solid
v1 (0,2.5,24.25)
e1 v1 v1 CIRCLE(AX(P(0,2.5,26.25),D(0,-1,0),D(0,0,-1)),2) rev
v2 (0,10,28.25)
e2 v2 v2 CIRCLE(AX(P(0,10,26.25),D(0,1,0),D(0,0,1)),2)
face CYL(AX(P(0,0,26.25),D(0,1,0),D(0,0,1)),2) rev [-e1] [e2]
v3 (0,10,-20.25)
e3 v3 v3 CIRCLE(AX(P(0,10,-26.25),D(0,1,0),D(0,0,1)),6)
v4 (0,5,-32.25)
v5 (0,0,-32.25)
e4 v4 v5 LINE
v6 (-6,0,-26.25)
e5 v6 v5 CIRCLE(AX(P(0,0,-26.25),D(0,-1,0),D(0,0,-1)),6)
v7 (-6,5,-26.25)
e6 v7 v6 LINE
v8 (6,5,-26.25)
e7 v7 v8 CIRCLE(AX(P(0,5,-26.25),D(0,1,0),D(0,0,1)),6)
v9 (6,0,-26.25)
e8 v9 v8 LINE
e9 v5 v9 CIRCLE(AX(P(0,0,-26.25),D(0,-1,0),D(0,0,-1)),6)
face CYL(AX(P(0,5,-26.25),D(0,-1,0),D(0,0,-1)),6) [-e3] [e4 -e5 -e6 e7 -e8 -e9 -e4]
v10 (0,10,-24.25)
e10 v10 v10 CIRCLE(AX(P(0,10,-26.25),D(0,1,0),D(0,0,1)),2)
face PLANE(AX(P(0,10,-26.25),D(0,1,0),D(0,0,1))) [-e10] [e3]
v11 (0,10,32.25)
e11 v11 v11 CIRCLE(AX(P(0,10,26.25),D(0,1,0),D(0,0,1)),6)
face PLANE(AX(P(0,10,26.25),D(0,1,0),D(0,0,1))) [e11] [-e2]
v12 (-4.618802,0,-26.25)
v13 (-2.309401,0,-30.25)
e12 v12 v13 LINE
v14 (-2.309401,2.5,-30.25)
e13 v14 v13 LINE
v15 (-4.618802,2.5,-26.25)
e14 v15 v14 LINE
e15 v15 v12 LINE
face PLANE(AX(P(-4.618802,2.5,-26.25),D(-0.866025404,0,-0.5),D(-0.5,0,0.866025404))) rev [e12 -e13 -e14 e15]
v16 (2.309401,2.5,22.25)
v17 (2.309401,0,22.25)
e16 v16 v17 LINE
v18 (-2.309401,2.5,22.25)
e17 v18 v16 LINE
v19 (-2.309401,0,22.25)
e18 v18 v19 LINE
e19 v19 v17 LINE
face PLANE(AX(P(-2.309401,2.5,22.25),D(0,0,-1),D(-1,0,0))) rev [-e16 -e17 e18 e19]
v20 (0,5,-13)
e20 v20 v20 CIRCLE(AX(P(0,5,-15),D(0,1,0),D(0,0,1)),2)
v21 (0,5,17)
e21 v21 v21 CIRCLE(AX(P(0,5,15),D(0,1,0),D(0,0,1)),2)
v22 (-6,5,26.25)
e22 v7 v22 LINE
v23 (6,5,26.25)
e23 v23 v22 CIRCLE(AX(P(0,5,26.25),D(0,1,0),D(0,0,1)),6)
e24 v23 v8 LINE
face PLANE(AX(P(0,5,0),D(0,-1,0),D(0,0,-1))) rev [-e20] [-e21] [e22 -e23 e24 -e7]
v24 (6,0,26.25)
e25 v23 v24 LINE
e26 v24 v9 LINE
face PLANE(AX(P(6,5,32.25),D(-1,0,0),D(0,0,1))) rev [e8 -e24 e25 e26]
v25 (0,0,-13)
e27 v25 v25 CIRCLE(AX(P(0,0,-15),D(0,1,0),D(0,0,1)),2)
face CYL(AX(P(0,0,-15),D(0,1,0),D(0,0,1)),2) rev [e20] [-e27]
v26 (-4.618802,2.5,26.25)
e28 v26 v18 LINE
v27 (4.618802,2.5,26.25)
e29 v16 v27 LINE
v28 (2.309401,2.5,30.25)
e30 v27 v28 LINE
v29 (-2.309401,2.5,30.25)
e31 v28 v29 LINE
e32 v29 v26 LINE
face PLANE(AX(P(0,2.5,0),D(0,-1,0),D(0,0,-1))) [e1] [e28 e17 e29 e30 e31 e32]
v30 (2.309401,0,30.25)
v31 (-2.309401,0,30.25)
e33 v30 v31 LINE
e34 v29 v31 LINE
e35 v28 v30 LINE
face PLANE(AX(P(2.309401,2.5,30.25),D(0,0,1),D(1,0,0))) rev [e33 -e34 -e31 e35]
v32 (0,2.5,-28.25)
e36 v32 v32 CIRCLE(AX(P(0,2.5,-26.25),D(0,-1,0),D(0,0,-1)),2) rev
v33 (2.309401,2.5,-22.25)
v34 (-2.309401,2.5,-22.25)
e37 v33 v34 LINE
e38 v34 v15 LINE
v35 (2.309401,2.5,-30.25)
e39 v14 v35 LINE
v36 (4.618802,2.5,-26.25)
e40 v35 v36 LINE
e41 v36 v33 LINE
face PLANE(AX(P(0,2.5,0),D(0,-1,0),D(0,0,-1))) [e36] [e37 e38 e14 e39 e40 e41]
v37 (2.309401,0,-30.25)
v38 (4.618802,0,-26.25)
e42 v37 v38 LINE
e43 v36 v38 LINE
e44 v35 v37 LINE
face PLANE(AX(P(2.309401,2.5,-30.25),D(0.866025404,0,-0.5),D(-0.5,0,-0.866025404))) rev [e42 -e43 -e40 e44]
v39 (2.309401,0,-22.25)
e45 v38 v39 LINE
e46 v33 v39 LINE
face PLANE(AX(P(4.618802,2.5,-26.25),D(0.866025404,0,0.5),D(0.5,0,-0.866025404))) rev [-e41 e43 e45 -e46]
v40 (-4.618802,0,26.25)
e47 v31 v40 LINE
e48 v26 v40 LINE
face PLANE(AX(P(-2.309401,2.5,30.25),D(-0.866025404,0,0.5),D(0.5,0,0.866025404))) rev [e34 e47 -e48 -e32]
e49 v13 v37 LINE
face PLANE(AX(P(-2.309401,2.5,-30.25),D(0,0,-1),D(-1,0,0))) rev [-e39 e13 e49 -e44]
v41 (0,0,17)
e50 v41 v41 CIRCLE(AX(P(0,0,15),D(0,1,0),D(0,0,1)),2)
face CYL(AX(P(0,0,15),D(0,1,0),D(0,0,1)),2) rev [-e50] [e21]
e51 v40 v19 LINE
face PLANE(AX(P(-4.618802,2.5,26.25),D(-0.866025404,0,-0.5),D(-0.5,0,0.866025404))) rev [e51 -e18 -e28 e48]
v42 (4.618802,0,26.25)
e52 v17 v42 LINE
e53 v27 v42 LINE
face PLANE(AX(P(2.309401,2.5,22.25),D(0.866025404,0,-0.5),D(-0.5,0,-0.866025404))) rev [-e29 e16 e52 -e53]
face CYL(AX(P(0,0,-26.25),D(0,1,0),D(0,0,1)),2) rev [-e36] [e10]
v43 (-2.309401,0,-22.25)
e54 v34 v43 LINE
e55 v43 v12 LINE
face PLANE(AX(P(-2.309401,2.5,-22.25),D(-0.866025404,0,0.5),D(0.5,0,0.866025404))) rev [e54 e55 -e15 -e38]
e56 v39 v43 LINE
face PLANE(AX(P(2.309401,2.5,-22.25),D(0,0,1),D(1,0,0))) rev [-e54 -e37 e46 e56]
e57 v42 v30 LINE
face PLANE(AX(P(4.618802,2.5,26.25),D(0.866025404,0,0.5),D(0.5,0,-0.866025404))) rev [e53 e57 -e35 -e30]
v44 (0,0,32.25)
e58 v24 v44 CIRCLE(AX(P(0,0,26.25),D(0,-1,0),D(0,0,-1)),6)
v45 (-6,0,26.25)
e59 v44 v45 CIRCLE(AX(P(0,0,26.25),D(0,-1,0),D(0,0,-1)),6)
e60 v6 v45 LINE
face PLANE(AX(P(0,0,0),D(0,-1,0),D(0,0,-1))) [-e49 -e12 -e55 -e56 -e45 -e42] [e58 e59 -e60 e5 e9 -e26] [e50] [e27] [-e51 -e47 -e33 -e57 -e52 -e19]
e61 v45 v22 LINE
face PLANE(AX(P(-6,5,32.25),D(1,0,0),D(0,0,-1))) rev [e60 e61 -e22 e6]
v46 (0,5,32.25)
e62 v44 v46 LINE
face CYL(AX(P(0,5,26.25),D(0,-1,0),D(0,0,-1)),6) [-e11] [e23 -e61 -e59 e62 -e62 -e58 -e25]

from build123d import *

# Parameters (mm, degrees)
SKETCH1_W           = 12
SKETCH1_H           = 64.5
BOSS_EXTRUDE1_DEPTH = 5
FILLET1_R           = 6
SKETCH2_R           = 2
CUT_EXTRUDE1_DEPTH  = 34.182261828
BOSS_EXTRUDE2_START = 5
SKETCH3_R           = 6
SKETCH3_R_2         = 2
BOSS_EXTRUDE2_DEPTH = 5
SKETCH4_R           = 2
CUT_EXTRUDE2_DEPTH  = 34.182261828
CUT_EXTRUDE3_DEPTH  = 2.5


with BuildPart() as part:
    # Sketch1 → Boss-Extrude1 (new body)
    with BuildSketch(Plane(origin=(0, 0, 0), x_dir=(1, 0, 0), z_dir=(0, 1, 0))):
        Rectangle(SKETCH1_W, SKETCH1_H)
    extrude(amount=BOSS_EXTRUDE1_DEPTH)

    # Fillet1
    fillet1_edges = [part.edges().sort_by_distance(p)[0] for p in [
        (-6, 2.5, -32.25),
        (6, 2.5, -32.25),
        (-6, 2.5, 32.25),
        (6, 2.5, 32.25),
    ]]
    fillet(fillet1_edges, radius=FILLET1_R - 0.0001)  # a hair under: the kernel refuses the full size

    # Sketch2 → Cut-Extrude1 (cut, through all)
    with BuildSketch(Plane(origin=(0, 5, 0), x_dir=(1, 0, 0), z_dir=(0, 1, 0))):
        with Locations(Location((0, -26.25, 0), (0, 0, 270))):
            Circle(SKETCH2_R)
        with Locations(Location((0, 26.25, 0), (0, 0, 270))):
            Circle(SKETCH2_R)
    extrude(amount=-CUT_EXTRUDE1_DEPTH, mode=Mode.SUBTRACT)

    # Sketch3 → Boss-Extrude2 (add)
    # profile 1 of 2: a face of its own
    with BuildSketch(Plane(origin=(0, 5, 0), x_dir=(1, 0, 0), z_dir=(0, 1, 0)).offset(BOSS_EXTRUDE2_START)):
        with Locations(Location((0, -26.25, 0), (0, 0, 270))):
            Circle(SKETCH3_R)
        with Locations(Location((0, -26.25, 0), (0, 0, 270))):
            Circle(SKETCH3_R_2, mode=Mode.SUBTRACT)
    # profile 2 of 2: a face of its own
    with BuildSketch(Plane(origin=(0, 5, 0), x_dir=(1, 0, 0), z_dir=(0, 1, 0)).offset(BOSS_EXTRUDE2_START)):
        with Locations(Location((0, 26.25, 0), (0, 0, 90))):
            Circle(SKETCH3_R)
        with Locations(Location((0, 26.25, 0), (0, 0, 270))):
            Circle(SKETCH3_R_2, mode=Mode.SUBTRACT)
    extrude(amount=-BOSS_EXTRUDE2_DEPTH)

    # Sketch4 → Cut-Extrude2 (cut, through all)
    with BuildSketch(Plane(origin=(0, 5, 0), x_dir=(1, 0, 0), z_dir=(0, 1, 0))):
        with Locations(Location((0, 15, 0), (0, 0, 270))):
            Circle(SKETCH4_R)
        with Locations(Location((0, -15, 0), (0, 0, 270))):
            Circle(SKETCH4_R)
    extrude(amount=-CUT_EXTRUDE2_DEPTH, mode=Mode.SUBTRACT)

    # Sketch5 → Cut-Extrude3 (cut)
    with BuildSketch(Plane.XZ):
        Polygon((4.618802154, 26.25), (2.309401077, 30.25), (-2.309401077, 30.25), (-4.618802154, 26.25), (-2.309401077, 22.25), (2.309401077, 22.25), align=None)
        Polygon((2.309401077, -22.25), (-2.309401077, -22.25), (-4.618802154, -26.25), (-2.309401077, -30.25), (2.309401077, -30.25), (4.618802154, -26.25), align=None)
    extrude(amount=-CUT_EXTRUDE3_DEPTH, mode=Mode.SUBTRACT)


solid = part.part
